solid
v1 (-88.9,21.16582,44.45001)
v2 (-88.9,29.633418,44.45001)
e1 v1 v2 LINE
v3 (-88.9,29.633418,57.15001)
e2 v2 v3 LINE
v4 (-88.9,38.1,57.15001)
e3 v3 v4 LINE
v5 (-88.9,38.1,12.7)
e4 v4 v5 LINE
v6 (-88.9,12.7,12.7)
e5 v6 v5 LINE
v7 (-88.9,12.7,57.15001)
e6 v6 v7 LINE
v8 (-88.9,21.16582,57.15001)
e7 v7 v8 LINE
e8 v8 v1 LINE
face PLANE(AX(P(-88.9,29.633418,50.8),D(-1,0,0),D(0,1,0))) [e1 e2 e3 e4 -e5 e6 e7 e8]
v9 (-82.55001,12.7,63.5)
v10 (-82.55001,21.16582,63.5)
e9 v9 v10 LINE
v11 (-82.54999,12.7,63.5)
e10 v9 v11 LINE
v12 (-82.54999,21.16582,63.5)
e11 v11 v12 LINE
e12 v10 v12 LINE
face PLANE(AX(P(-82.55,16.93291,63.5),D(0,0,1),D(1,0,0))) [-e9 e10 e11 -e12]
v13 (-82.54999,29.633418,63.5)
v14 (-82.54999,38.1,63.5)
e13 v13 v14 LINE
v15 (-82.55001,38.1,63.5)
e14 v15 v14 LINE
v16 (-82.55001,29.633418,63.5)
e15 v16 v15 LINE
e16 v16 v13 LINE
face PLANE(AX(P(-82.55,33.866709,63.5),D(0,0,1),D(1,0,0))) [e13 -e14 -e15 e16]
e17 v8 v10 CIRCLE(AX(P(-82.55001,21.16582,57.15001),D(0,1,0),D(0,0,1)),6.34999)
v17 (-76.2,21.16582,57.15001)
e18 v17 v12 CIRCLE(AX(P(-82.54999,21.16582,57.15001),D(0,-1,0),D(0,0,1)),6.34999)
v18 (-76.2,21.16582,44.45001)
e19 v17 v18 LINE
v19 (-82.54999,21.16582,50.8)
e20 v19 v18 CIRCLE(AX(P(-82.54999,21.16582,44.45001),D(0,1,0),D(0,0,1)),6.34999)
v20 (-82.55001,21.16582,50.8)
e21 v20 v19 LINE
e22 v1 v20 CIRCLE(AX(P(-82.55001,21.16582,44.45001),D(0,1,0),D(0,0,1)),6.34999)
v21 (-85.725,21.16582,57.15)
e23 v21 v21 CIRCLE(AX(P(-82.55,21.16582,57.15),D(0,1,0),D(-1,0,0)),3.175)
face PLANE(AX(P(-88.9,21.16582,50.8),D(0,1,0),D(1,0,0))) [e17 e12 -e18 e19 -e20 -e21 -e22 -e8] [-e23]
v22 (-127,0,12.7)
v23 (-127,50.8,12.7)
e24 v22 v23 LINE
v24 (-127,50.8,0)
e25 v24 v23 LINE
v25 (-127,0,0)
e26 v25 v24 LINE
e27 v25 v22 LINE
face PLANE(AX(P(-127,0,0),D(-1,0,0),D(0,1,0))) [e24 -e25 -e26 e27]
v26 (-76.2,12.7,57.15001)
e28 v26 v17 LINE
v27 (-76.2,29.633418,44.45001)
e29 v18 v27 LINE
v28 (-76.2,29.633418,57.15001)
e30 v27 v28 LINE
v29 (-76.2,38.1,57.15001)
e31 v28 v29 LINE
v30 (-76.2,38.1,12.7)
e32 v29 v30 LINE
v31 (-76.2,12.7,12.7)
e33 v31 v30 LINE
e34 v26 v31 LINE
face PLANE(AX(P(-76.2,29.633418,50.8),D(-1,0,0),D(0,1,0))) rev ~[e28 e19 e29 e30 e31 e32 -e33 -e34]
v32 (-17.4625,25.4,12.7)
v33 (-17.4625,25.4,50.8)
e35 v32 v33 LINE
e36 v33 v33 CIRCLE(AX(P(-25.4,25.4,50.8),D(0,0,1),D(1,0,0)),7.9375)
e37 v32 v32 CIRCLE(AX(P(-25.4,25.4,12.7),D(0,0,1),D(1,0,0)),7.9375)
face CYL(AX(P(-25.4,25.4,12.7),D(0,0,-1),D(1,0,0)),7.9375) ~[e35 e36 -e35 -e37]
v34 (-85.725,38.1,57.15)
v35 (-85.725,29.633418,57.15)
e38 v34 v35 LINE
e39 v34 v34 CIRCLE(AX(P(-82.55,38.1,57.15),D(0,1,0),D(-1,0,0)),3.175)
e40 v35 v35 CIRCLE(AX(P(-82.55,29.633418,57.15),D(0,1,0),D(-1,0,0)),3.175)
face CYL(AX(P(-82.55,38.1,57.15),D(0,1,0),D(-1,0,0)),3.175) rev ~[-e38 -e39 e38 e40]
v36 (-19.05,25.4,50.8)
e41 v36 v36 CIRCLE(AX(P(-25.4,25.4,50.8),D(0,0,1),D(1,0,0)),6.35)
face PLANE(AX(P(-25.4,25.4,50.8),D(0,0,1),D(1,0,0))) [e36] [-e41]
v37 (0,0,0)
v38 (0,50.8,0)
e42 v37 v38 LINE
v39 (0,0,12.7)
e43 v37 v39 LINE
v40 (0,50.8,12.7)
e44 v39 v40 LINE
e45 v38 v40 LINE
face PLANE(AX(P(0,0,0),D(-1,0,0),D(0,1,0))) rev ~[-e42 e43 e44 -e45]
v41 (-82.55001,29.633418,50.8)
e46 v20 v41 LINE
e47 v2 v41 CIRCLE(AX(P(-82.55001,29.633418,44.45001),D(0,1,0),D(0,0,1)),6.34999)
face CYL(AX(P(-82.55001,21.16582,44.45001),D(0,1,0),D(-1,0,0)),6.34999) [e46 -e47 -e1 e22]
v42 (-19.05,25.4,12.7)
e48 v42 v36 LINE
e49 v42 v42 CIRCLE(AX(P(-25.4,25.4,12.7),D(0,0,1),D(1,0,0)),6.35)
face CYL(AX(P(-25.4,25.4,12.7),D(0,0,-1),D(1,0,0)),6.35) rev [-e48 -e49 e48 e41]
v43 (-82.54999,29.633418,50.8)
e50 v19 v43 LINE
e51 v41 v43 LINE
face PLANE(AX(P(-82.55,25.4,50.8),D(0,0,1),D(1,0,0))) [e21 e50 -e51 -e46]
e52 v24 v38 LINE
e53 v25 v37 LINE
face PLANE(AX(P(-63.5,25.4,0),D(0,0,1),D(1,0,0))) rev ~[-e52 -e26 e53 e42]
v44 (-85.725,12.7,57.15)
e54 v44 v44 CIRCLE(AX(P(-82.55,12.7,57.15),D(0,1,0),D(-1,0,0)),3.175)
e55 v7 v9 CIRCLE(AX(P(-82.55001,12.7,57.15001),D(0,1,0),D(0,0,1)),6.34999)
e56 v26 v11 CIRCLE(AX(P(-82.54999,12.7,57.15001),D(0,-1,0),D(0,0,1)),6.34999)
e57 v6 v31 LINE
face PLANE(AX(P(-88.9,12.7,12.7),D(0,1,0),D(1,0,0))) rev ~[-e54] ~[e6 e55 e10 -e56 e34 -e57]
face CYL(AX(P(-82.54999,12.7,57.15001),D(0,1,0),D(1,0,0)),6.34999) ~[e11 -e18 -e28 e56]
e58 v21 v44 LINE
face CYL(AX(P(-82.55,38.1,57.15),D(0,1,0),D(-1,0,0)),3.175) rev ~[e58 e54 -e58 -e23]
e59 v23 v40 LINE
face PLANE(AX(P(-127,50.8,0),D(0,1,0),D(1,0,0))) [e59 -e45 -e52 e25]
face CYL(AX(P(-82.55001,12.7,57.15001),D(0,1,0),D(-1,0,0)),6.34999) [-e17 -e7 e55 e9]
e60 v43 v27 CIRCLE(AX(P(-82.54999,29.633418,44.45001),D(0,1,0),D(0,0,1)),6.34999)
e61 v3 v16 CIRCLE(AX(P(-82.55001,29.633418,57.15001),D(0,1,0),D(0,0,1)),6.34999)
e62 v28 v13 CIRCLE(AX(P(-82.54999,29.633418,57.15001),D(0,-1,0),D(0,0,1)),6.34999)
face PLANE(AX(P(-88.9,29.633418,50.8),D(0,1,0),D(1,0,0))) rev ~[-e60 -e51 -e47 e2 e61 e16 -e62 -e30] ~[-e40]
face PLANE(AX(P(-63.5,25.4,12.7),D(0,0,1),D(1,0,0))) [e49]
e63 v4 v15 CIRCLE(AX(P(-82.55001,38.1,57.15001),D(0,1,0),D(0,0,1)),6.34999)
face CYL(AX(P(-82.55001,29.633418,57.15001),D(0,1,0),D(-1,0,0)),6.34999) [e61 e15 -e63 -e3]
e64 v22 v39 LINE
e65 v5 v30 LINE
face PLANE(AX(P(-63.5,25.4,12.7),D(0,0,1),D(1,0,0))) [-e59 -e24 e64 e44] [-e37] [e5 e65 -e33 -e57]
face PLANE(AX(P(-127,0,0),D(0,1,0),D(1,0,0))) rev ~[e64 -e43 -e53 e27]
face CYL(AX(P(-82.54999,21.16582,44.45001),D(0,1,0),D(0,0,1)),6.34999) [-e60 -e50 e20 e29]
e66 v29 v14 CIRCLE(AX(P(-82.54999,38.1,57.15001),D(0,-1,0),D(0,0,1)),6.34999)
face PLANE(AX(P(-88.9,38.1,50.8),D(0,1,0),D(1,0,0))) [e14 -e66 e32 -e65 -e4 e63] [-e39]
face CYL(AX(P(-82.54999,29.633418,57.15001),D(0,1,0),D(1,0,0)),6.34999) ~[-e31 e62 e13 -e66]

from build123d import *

# Parameters (mm, degrees)
F0_W     = 127
F0_H     = 50.8
F1_DEPTH = 12.7
F2_R     = 7.9375
F2_R_2   = 6.35
F2_W     = 12.7
F2_H     = 25.4
F3_DEPTH = 38.1
F4_W     = 12.7
F4_H     = 8.466582
F4_H_2   = 8.46582
F5_DEPTH = 12.7
F6_R     = 6.34999
F7_R     = 3.175
F8_DEPTH = 25.4


# Not quite as in the source:
# - a fillet or chamfer is up to 0.001 mm smaller than in the source, because OpenCascade refuses the exact size


with BuildPart() as f1:
    # F0 (on Top) → F1 (new body)
    with BuildSketch(Plane.XY):
        with Locations((-63.5, 25.4)):
            Rectangle(F0_W, F0_H)
    extrude(amount=F1_DEPTH)

    # F2 (on face) → F3 (join)
    with BuildSketch(Plane.XY.offset(12.7)):
        with Locations((-25.4, 25.4)):
            Circle(F2_R)
        with Locations((-25.4, 25.4)):
            Circle(F2_R_2, mode=Mode.SUBTRACT)
        with Locations((-82.55, 25.4)):
            Rectangle(F2_W, F2_H)
    extrude(amount=F3_DEPTH)

    # F4 (on face) → F5 (join)
    with BuildSketch(Plane.XY.offset(50.8)):
        with Locations((-82.55, 33.866709)):
            Rectangle(F4_W, F4_H)
        with Locations((-82.55, 16.93291)):
            Rectangle(F4_W, F4_H_2)
    extrude(amount=F5_DEPTH)

    # F6 (radius 6.35 in the source; OpenCascade refuses exactly that, so slightly less here)
    f6_edges = [f1.edges().sort_by_distance(p)[0] for p in [
        (-88.9, 33.866709, 63.5),
        (-88.9, 16.93291, 63.5),
        (-76.2, 33.866709, 63.5),
        (-76.2, 16.93291, 63.5),
        (-88.9, 25.399619, 50.8),
        (-76.2, 25.399619, 50.8),
    ]]
    fillet(f6_edges, radius=F6_R)

    # F7 (on face) → F8 (cut)
    with BuildSketch(Plane(origin=(0, 38.1, 0), x_dir=(-1, 0, 0), z_dir=(0, 1, 0))):
        with Locations((82.55, 57.15)):
            Circle(F7_R)
    extrude(amount=-F8_DEPTH, mode=Mode.SUBTRACT)


solid = f1.part
